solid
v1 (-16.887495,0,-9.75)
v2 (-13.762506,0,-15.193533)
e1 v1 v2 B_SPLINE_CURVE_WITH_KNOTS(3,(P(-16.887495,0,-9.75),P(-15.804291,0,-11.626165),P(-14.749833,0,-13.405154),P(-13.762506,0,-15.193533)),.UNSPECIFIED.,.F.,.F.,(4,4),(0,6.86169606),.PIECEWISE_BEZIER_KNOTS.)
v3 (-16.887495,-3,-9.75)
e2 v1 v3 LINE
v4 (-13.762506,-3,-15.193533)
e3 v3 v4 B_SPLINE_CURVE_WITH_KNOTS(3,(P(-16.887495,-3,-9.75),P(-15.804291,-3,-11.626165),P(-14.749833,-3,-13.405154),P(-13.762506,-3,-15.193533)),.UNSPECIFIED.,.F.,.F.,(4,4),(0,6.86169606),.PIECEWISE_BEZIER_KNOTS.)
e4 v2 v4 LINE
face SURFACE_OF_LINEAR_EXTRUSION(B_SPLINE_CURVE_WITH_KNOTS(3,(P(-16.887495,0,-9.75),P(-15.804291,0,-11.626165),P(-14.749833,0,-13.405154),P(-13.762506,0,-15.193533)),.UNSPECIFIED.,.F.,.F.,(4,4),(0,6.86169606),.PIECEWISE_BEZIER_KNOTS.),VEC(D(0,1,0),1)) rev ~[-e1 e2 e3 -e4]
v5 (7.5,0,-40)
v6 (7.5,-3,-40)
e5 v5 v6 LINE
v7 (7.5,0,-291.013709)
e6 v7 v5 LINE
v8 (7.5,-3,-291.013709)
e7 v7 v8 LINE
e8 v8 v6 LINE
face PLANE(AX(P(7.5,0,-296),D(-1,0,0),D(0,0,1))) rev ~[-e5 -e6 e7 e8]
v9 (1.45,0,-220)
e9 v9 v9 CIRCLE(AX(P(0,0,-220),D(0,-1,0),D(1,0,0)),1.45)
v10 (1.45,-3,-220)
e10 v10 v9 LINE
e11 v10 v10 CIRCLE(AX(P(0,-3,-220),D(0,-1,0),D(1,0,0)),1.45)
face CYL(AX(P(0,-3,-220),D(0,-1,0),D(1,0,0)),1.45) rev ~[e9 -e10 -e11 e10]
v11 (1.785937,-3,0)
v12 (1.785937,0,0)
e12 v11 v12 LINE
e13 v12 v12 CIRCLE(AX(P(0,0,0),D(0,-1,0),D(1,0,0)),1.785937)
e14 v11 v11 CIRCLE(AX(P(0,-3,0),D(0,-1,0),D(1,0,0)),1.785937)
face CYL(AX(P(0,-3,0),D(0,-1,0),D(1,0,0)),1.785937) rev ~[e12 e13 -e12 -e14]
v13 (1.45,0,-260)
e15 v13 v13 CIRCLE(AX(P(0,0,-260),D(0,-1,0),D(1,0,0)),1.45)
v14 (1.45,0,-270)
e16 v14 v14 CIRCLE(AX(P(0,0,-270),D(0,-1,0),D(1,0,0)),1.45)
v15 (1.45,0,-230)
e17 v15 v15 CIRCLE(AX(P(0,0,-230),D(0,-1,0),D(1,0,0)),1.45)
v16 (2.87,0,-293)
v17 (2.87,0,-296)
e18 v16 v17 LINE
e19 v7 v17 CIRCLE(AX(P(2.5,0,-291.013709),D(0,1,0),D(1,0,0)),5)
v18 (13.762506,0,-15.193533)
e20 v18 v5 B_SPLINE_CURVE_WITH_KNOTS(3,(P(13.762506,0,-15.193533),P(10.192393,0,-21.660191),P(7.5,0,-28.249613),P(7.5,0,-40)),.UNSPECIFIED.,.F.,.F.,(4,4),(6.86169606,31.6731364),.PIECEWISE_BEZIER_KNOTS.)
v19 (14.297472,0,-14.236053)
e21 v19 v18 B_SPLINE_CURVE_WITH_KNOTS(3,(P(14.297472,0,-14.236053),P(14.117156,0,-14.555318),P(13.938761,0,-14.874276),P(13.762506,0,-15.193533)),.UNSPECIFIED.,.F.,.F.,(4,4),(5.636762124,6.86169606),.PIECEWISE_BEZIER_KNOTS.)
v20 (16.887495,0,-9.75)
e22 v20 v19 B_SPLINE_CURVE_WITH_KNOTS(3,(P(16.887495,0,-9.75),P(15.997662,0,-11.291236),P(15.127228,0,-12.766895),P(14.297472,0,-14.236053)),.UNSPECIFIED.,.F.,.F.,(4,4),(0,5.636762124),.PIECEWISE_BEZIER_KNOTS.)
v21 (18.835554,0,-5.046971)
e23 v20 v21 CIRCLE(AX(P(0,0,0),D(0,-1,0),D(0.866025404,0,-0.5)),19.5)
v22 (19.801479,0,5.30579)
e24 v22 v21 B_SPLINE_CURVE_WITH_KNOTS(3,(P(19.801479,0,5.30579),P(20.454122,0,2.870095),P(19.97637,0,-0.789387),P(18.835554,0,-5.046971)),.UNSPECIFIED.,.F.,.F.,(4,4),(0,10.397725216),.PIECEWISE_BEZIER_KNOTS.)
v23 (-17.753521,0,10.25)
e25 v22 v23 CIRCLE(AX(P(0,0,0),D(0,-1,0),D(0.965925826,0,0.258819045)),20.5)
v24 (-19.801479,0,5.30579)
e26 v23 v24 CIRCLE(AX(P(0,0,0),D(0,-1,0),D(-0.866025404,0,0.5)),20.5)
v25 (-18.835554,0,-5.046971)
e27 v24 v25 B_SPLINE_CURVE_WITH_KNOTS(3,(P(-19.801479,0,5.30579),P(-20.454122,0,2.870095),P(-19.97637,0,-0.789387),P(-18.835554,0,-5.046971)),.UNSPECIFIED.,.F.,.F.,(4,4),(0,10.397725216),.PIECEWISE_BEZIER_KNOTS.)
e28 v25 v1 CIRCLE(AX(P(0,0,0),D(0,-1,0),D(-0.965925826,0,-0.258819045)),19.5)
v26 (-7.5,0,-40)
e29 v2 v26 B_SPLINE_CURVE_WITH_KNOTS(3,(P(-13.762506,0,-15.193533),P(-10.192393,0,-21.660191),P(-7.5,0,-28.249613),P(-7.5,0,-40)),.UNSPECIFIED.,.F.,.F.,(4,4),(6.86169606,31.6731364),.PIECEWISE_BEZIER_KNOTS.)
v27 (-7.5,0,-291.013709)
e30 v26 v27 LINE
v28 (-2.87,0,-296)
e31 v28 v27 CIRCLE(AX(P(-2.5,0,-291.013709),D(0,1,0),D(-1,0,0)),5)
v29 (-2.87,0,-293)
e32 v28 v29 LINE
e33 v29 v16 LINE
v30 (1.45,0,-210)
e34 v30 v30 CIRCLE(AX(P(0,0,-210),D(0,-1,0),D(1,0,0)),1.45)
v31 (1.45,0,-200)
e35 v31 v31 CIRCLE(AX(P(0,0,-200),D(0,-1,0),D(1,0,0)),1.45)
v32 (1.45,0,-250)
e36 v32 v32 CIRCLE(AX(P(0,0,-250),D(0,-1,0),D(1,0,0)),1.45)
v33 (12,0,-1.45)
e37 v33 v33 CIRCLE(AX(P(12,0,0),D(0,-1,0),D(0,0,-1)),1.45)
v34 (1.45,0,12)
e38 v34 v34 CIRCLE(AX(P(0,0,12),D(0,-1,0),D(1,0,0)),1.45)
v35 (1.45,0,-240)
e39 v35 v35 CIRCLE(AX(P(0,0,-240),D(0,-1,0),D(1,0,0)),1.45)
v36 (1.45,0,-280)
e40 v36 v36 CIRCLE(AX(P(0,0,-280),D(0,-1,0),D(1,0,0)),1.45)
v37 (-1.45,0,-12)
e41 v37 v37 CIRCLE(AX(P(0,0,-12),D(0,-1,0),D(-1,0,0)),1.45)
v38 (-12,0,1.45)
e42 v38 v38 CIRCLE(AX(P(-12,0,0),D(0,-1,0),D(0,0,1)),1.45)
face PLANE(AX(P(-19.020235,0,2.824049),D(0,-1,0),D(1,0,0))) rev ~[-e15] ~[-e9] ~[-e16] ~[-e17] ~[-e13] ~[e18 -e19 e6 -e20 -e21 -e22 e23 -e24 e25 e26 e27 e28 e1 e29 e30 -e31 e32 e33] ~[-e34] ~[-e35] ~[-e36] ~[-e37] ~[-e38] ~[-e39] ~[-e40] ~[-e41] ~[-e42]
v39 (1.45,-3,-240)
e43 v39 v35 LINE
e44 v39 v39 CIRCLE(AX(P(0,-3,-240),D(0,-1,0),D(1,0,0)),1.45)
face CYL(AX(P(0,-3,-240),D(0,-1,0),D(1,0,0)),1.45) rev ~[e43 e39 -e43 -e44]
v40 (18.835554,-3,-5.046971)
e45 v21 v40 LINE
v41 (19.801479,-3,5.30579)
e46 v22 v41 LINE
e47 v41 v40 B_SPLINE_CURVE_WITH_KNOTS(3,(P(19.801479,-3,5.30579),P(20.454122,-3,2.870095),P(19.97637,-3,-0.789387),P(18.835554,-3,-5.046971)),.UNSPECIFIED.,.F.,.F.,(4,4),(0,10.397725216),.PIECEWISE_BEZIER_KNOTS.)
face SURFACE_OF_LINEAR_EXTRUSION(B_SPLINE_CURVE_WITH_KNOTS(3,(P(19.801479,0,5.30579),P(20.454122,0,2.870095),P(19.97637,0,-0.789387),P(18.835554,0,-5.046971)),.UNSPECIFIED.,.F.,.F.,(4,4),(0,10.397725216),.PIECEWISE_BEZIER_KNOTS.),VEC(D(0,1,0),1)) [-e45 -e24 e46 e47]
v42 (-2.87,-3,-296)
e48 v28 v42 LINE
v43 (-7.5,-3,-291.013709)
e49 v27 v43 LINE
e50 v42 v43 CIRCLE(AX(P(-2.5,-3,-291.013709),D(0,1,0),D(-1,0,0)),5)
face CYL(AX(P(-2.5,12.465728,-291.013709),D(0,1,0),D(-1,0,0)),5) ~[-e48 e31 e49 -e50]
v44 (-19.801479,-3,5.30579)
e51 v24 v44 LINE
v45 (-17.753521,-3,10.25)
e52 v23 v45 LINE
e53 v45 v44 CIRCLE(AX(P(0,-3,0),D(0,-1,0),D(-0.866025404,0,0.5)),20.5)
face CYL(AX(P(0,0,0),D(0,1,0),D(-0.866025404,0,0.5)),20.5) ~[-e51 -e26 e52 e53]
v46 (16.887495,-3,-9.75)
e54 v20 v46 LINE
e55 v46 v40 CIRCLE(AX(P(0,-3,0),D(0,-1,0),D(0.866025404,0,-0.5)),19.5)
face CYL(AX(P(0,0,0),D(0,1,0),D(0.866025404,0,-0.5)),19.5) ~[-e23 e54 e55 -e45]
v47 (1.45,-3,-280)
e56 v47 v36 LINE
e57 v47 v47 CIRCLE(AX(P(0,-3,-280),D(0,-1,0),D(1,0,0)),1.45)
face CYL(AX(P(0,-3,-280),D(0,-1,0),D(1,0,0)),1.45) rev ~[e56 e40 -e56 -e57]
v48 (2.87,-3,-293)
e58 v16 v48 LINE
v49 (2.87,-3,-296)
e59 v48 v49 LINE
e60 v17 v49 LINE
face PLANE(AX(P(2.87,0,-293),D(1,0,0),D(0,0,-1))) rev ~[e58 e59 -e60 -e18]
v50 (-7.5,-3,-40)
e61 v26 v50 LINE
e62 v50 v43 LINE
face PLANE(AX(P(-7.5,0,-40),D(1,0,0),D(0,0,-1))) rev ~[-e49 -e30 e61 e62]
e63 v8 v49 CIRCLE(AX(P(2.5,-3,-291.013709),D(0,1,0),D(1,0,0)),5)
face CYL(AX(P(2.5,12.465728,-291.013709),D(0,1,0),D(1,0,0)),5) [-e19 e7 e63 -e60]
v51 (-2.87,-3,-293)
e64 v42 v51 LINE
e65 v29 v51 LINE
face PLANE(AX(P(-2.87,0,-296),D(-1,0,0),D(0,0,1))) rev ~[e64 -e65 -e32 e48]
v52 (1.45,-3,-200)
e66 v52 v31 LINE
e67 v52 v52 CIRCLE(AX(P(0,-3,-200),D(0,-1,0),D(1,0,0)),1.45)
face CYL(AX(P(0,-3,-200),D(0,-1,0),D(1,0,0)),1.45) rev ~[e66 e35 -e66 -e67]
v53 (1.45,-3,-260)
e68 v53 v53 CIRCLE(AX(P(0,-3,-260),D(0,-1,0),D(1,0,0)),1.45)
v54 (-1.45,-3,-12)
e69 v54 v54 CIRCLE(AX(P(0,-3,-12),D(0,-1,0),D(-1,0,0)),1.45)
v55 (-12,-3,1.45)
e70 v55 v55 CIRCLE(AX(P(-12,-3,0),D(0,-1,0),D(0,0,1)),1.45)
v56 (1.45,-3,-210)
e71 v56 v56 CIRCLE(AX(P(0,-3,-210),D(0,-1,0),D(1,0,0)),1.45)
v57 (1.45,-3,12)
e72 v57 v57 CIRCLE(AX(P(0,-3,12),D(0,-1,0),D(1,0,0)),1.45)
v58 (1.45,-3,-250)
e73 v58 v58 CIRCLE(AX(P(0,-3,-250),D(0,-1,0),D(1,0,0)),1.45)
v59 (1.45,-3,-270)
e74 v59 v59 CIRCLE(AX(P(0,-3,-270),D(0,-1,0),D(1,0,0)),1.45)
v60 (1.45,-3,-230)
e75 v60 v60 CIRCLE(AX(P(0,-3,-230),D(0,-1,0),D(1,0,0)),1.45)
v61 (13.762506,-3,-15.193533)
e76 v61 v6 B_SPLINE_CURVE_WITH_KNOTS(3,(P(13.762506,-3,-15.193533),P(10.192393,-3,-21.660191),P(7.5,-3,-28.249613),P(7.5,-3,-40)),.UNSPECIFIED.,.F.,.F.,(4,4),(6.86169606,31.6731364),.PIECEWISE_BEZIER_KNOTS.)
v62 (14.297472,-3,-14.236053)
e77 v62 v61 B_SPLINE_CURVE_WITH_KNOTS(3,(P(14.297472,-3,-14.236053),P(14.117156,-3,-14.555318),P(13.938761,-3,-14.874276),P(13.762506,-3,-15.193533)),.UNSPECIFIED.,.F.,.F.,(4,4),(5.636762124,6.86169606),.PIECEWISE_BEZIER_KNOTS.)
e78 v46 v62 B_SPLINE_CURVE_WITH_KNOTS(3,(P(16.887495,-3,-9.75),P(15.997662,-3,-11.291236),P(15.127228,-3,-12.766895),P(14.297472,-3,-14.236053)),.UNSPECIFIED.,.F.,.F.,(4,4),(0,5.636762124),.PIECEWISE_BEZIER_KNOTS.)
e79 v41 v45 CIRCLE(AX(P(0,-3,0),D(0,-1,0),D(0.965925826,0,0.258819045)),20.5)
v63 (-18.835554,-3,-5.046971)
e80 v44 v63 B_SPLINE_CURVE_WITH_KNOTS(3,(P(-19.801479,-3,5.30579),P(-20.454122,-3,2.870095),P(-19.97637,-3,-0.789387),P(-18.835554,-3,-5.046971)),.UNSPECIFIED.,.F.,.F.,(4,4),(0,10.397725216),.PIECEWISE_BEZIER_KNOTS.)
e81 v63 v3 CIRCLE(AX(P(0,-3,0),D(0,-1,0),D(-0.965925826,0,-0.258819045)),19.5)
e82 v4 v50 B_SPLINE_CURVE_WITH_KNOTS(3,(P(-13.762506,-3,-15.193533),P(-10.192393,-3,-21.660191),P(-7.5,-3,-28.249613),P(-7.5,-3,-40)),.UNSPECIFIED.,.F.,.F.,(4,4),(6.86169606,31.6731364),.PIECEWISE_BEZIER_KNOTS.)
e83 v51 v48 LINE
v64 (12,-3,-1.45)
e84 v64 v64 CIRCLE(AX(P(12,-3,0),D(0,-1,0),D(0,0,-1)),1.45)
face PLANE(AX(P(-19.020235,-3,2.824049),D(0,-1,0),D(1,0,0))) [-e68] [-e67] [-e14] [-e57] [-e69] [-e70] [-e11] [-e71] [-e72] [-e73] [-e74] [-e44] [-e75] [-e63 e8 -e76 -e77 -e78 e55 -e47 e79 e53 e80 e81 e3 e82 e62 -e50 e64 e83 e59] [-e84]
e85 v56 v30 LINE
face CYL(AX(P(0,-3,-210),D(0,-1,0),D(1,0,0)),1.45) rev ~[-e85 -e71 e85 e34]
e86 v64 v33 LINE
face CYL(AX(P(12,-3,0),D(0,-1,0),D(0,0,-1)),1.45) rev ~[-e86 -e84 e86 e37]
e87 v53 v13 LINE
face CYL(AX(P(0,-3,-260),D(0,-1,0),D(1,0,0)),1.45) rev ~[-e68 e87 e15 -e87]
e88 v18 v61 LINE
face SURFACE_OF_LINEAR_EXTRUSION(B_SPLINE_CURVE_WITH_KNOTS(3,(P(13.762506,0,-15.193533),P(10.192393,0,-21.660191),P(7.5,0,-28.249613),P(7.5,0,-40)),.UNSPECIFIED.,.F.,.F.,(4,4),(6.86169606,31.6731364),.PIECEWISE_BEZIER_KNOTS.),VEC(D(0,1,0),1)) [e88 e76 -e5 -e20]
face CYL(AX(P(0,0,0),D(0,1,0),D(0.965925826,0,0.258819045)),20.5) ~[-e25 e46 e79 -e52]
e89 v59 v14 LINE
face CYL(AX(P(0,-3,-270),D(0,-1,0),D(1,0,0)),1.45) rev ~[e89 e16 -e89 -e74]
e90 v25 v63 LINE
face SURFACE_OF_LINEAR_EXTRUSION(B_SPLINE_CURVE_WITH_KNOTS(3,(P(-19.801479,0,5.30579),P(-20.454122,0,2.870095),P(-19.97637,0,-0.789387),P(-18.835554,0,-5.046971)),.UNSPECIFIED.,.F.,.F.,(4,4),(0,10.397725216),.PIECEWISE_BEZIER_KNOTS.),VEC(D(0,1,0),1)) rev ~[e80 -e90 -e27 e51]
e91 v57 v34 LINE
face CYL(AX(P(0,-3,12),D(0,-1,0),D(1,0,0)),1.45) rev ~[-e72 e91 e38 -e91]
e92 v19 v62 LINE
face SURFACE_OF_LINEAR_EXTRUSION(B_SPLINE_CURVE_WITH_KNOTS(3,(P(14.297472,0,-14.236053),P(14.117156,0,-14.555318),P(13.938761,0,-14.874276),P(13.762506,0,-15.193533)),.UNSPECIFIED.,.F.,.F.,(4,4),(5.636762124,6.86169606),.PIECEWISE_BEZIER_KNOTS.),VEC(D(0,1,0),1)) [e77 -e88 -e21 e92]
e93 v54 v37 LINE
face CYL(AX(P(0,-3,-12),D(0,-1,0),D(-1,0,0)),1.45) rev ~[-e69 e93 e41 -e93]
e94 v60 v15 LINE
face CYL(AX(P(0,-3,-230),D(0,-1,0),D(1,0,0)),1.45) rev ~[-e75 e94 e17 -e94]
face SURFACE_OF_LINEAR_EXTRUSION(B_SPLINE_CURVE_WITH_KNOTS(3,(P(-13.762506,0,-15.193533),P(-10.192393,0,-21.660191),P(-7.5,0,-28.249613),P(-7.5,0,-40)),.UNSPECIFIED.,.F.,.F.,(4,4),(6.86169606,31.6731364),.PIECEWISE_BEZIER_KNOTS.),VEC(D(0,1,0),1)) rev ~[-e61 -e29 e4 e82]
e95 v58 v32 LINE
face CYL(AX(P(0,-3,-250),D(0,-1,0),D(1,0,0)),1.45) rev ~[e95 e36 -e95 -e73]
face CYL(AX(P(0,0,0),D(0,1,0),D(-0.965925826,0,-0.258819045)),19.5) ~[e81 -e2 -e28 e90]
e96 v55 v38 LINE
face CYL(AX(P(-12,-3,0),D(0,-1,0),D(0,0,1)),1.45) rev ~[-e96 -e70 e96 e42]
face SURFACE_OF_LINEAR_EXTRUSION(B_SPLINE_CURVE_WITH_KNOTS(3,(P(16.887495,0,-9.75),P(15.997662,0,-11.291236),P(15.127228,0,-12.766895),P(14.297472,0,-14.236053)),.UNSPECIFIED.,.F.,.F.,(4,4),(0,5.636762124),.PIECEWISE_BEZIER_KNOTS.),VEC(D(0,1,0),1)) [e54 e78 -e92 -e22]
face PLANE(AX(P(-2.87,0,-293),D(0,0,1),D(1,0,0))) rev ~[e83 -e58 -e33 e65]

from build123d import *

# Parameters (mm, degrees)
F1_DEPTH        = 3
F2_R            = 1.7859375
F3_DEPTH        = 25
F4_T1_DEPTH     = 27.9314560345
F6_R            = 1.45
F7_DEPTH        = 25
F7_COPIES_COUNT = 4
F8_R            = 1.45
F9_DEPTH        = 25


# Not quite as in the source:
# - a fillet or chamfer that OpenCascade refuses, or shapes differently, is made with other operations: its cross-section is extruded or revolved along the edge and cut away or added
# - a pattern or mirror of a feature is missing from the dataset's text; its kind, count and spacing are read off the source's solid


with BuildPart() as f1:
    # F0 (on Front) → F1 (new body)
    with BuildSketch(Plane.XZ):
        with BuildLine():
            ThreePointArc((-17.7535207776, 10.25), (-18.9395304165, 7.8450103635), (-19.8014794389, 5.3057904246))
            add(Edge.make_bspline(
                [(-19.8014794389, 5.3057904246), (-20.454122155, 2.8700946489), (-19.9763700286, -0.7893865531), (-18.8355536126, -5.0469713795)],
                knots=[0, 0, 0, 0, 10.3977252163, 10.3977252163, 10.3977252163, 10.3977252163], degree=3))
            ThreePointArc((-18.8355536126, -5.0469713795), (-19.3331747968, 2.5452607483), (-16.8874953738, 9.75))
            Line((-16.8874953738, 9.75), (-17.7535207776, 10.25))
        make_face()
        with BuildLine():
            add(Edge.make_bspline(
                [(19.8014794389, 5.3057904246), (20.454122155, 2.8700946489), (19.9763700286, -0.7893865531), (18.8355536126, -5.0469713795)],
                knots=[0, 0, 0, 0, 10.3977252163, 10.3977252163, 10.3977252163, 10.3977252163], degree=3))
            ThreePointArc((19.8014794389, 5.3057904246), (2.6757869405, 20.3246196582), (-17.7535207776, 10.25))
            Line((-17.7535207776, 10.25), (-16.8874953738, 9.75))
            ThreePointArc((-16.8874953738, 9.75), (5.0469713795, 18.8355536126), (19.5, 0))
            ThreePointArc((19.5, 0), (19.3331747968, -2.5452607483), (18.8355536126, -5.0469713795))
        make_face()
        with BuildLine():
            ThreePointArc((-18.8355536126, -5.0469713795), (-18.015650884, -7.4623269311), (-16.8874953738, -9.75))
            ThreePointArc((-16.8874953738, -9.75), (0, -19.5), (16.8874953738, -9.75))
            ThreePointArc((16.8874953738, -9.75), (18.015650884, -7.4623269311), (18.8355536126, -5.0469713795))
            ThreePointArc((18.8355536126, -5.0469713795), (19.3331747968, -2.5452607483), (19.5, 0))
            ThreePointArc((19.5, 0), (5.0469713795, 18.8355536126), (-16.8874953738, 9.75))
            ThreePointArc((-16.8874953738, 9.75), (-19.3331747968, 2.5452607483), (-18.8355536126, -5.0469713795))
        make_face()
        with BuildLine():
            add(Edge.make_bspline(
                [(-16.8874953738, -9.75), (-15.8042909868, -11.6261650333), (-14.7498334446, -13.4051543525), (-13.7625055876, -15.1935328331)],
                knots=[0, 0, 0, 0, 6.8616960598, 6.8616960598, 6.8616960598, 6.8616960598], degree=3))
            ThreePointArc((-13.7625055876, -15.1935328331), (-0.0251276064, -20.4999846001), (13.7252177136, -15.2272255751))
            Line((13.7252177136, -15.2272255751), (14.297471583, -14.2360527984))
            add(Edge.make_bspline(
                [(16.8874953738, -9.75), (15.997662101, -11.2912364387), (15.1272281545, -12.7668954762), (14.297471583, -14.2360527984)],
                knots=[0, 0, 0, 0, 5.6367621242, 5.6367621242, 5.6367621242, 5.6367621242], degree=3))
            ThreePointArc((16.8874953738, -9.75), (0, -19.5), (-16.8874953738, -9.75))
        make_face()
        with BuildLine():
            Line((-7.5, -40), (7.5, -40))
            add(Edge.make_bspline(
                [(13.7625055876, -15.1935328331), (10.192393183, -21.6601914536), (7.5, -28.2496131611), (7.5, -40)],
                knots=[6.8616960598, 6.8616960598, 6.8616960598, 6.8616960598, 31.6731363997, 31.6731363997, 31.6731363997, 31.6731363997], degree=3))
            ThreePointArc((13.7625055876, -15.1935328331), (13.7438719752, -15.2103906304), (13.7252177136, -15.2272255751))
            ThreePointArc((13.7252177136, -15.2272255751), (-0.0251276064, -20.4999846001), (-13.7625055876, -15.1935328331))
            add(Edge.make_bspline(
                [(-13.7625055876, -15.1935328331), (-10.192393183, -21.6601914536), (-7.5, -28.2496131611), (-7.5, -40)],
                knots=[6.8616960598, 6.8616960598, 6.8616960598, 6.8616960598, 31.6731363997, 31.6731363997, 31.6731363997, 31.6731363997], degree=3))
        make_face()
        with BuildLine():
            ThreePointArc((13.7252177136, -15.2272255751), (13.7438719752, -15.2103906304), (13.7625055876, -15.1935328331))
            add(Edge.make_bspline(
                [(14.297471583, -14.2360527984), (14.1171558343, -14.5553177631), (13.9387610479, -14.8742756886), (13.7625055876, -15.1935328331)],
                knots=[5.6367621242, 5.6367621242, 5.6367621242, 5.6367621242, 6.8616960598, 6.8616960598, 6.8616960598, 6.8616960598], degree=3))
            Line((14.297471583, -14.2360527984), (13.7252177136, -15.2272255751))
        make_face()
        Polygon((7.5, -296), (7.5, -40), (-7.5, -40), (-7.5, -296), (-2.87, -296), (-2.87, -293), (2.87, -293), (2.87, -296), align=None)
    extrude(amount=F1_DEPTH)

    # F2 (on face) → F3 (cut)
    with BuildSketch(Plane.XZ.offset(3)):
        Circle(F2_R)
    extrude(amount=-F3_DEPTH, mode=Mode.SUBTRACT)

    # F4: fillet of radius 5 on 2 edges, made by hand

    # F4_s2 → F4_t1 (cut)
    with BuildSketch(Plane.XZ.offset(-12.4657280172)):
        with BuildLine():
            ThreePointArc((-7.5, -291.0137087931), (-6.1640141921, -294.4159139603), (-2.87, -296))
            Line((-2.87, -296), (-7.5, -296))
            Line((-7.5, -296), (-7.5, -291.0137087931))
        make_face()
        with BuildLine():
            ThreePointArc((7.5, -291.0137087931), (6.1640141921, -294.4159139603), (2.87, -296))
            Line((2.87, -296), (7.5, -296))
            Line((7.5, -296), (7.5, -291.0137087931))
        make_face()
    extrude(amount=F4_T1_DEPTH, mode=Mode.SUBTRACT)

    # F6 (on face) → F7 (cut)
    with BuildSketch(Plane.XZ.offset(3)):
        with Locations((0, 12)):
            Circle(F6_R)
    f7 = extrude(amount=-F7_DEPTH, mode=Mode.SUBTRACT)

    # F7_copies: F7 ×4 about axis
    f7_copies_axis = Axis((0, 0, 0), (0, 1, 0))
    for i in range(1, F7_COPIES_COUNT):
        add(f7.rotate(f7_copies_axis, i * 360 / F7_COPIES_COUNT), mode=Mode.SUBTRACT)

    # F8 (on face) → F9 (cut)
    with BuildSketch(Plane.XZ.offset(3)):
        with Locations((0, -200)):
            Circle(F8_R)
        with Locations((0, -210)):
            Circle(F8_R)
        with Locations((0, -220)):
            Circle(F8_R)
        with Locations((0, -230)):
            Circle(F8_R)
        with Locations((0, -240)):
            Circle(F8_R)
        with Locations((0, -250)):
            Circle(F8_R)
        with Locations((0, -260)):
            Circle(F8_R)
        with Locations((0, -270)):
            Circle(F8_R)
        with Locations((0, -280)):
            Circle(F8_R)
    extrude(amount=-F9_DEPTH, mode=Mode.SUBTRACT)


solid = f1.part
